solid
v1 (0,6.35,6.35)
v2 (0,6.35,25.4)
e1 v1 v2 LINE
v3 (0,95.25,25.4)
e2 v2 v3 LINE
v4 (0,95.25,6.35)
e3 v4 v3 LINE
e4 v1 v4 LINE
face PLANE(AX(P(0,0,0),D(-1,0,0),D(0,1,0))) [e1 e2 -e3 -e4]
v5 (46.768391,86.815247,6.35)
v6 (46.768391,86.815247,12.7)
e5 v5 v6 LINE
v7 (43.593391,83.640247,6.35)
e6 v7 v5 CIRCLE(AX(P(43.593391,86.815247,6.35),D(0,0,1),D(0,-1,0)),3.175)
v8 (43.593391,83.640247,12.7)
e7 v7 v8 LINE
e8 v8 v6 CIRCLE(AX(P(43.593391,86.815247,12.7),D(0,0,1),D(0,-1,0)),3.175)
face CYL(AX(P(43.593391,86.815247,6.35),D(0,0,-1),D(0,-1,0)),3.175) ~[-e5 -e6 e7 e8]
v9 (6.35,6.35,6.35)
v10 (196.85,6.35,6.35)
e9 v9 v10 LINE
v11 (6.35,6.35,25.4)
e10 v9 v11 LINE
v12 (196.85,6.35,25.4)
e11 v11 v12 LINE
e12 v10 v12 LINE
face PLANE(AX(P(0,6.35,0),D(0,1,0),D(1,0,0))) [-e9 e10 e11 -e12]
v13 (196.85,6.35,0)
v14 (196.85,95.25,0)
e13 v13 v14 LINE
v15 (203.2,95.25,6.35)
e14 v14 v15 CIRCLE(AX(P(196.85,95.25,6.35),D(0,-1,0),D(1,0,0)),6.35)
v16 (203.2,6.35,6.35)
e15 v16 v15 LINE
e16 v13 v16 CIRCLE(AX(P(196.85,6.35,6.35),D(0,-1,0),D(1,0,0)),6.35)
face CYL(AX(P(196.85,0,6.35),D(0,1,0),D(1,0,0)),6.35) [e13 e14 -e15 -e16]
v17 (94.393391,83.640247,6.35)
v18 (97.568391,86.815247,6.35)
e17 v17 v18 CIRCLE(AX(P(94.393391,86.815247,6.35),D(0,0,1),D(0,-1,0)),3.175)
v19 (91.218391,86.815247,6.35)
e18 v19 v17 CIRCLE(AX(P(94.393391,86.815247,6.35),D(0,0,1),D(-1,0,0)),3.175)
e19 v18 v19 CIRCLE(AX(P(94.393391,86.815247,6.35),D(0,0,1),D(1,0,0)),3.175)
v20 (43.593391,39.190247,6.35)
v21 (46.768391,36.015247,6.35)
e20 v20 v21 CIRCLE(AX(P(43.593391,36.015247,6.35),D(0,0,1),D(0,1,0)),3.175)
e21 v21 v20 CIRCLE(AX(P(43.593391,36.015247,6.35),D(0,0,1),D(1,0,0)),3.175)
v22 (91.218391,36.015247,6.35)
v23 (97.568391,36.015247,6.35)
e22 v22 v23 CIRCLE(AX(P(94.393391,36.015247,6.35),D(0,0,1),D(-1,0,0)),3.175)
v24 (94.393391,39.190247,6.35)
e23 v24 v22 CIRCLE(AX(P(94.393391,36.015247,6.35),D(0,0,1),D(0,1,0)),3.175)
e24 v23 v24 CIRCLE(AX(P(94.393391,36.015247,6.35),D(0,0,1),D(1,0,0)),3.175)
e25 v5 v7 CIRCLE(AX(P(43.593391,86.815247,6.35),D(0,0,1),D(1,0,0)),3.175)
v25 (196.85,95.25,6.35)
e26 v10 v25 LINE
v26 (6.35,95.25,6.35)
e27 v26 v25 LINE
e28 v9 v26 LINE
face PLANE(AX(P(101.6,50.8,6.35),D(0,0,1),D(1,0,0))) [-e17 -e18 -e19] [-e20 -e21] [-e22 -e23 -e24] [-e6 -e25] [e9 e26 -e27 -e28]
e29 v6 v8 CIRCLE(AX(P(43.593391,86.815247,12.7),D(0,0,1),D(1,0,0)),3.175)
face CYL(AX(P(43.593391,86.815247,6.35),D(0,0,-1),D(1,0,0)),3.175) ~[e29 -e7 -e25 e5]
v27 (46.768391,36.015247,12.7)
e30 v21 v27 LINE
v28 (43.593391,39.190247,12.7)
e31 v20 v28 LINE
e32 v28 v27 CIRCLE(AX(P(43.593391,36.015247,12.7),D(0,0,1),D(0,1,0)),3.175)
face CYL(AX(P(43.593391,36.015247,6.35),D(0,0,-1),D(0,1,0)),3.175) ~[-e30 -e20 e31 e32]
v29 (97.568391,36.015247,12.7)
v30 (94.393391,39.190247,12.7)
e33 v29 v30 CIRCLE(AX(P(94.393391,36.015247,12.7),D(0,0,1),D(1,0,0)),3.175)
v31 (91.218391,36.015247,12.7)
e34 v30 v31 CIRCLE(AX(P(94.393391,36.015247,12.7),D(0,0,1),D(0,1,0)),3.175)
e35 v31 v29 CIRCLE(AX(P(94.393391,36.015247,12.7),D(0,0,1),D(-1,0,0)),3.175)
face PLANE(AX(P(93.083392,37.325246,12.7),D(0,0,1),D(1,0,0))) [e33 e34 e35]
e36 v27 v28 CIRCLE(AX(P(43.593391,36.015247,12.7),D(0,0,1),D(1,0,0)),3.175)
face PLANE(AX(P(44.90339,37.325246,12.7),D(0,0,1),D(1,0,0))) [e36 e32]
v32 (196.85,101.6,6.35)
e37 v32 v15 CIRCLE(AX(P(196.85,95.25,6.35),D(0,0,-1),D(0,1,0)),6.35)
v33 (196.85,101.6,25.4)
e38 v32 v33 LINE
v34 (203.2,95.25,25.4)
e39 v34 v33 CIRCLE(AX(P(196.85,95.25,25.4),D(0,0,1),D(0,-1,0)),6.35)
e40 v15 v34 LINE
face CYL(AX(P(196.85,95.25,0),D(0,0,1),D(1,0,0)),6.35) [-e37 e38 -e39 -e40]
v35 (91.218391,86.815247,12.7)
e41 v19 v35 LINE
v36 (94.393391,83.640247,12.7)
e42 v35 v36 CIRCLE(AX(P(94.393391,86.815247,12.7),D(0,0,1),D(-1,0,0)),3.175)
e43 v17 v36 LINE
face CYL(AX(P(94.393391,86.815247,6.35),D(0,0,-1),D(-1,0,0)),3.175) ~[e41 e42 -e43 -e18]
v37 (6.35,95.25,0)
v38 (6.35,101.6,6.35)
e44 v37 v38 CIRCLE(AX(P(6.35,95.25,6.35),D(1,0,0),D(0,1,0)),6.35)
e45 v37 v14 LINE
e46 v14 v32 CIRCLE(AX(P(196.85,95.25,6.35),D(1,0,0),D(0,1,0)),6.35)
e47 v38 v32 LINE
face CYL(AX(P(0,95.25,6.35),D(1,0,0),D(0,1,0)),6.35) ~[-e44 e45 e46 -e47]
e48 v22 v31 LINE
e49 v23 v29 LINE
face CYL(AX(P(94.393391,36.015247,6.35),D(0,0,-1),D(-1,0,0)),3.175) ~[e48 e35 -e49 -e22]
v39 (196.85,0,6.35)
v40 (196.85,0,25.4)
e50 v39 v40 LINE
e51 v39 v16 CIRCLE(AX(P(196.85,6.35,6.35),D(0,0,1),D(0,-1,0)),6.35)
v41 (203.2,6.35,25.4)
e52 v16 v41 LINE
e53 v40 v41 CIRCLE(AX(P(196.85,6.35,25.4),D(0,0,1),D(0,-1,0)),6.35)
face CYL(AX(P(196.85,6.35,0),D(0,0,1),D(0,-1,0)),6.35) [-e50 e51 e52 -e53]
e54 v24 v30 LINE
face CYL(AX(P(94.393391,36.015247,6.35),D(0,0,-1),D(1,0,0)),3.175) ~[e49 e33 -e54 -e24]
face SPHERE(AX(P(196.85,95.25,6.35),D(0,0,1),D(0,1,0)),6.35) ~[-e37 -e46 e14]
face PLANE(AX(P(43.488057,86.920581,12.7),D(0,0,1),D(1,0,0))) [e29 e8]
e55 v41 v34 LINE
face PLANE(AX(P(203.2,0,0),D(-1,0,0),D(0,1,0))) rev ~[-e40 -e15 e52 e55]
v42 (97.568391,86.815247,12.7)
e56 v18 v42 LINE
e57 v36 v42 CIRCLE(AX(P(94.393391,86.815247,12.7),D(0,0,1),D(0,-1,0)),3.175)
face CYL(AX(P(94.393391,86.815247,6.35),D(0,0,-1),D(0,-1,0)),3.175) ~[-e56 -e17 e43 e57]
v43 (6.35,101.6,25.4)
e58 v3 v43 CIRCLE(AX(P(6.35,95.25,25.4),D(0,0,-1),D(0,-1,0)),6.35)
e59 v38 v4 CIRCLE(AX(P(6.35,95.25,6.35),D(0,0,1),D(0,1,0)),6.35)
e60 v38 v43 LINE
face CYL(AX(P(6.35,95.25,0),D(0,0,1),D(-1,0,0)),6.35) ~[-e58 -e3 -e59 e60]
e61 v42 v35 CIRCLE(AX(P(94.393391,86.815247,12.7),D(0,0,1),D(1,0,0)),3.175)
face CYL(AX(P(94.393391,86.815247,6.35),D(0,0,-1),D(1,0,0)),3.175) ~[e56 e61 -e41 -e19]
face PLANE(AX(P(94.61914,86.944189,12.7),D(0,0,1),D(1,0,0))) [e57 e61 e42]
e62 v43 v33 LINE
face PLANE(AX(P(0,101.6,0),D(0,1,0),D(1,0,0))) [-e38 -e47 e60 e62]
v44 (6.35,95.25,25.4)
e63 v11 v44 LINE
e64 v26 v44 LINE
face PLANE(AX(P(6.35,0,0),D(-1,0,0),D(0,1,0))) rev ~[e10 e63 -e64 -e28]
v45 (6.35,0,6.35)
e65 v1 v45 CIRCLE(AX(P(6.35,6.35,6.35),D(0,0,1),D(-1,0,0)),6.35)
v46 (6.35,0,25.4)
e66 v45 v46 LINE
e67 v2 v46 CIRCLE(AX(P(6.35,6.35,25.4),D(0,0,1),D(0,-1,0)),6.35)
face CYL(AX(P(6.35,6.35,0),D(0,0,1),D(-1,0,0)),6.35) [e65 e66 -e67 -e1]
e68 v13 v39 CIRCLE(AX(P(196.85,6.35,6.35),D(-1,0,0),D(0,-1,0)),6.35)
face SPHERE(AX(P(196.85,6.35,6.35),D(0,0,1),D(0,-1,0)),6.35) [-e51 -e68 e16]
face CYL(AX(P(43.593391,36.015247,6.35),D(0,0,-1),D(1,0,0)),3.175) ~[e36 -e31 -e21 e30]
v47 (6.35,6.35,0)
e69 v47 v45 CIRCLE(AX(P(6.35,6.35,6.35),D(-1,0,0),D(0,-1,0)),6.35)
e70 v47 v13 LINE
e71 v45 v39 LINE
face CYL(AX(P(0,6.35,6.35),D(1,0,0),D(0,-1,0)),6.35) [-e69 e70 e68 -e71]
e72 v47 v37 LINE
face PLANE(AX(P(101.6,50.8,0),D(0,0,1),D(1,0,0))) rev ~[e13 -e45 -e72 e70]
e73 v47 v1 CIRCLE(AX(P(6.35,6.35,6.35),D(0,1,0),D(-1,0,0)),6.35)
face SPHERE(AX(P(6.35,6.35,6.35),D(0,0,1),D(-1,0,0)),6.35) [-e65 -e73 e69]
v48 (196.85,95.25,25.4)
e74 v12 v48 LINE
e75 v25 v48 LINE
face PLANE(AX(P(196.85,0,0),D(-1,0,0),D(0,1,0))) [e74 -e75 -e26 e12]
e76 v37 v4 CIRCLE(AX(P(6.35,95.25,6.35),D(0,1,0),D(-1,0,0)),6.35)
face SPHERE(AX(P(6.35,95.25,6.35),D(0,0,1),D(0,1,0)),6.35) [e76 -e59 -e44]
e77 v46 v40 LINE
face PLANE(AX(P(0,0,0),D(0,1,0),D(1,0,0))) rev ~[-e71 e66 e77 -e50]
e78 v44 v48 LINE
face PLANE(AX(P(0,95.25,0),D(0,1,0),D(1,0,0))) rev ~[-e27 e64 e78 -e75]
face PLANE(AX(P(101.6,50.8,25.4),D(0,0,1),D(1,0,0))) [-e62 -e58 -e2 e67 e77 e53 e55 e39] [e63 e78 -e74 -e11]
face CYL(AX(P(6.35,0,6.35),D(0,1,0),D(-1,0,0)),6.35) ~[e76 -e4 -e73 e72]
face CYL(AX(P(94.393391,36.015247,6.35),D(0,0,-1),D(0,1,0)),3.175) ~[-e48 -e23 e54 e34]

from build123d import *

# Parameters (mm, degrees)
F0_W     = 203.2
F0_H     = 101.6
F1_DEPTH = 25.4
F2_R     = 6.35
F3_T     = 6.35
F5_DEPTH = 6.35


# Not quite as in the source:
# - a shell that OpenCascade refuses in one call is made with other operations: the cavity is built on its own and cut out


with BuildPart() as f1:
    # F0 (on Top) → F1 (new body)
    with BuildSketch(Plane.XY):
        with Locations((101.6, 50.8)):
            Rectangle(F0_W, F0_H)
    extrude(amount=F1_DEPTH)

    # F2
    f2_edges = [f1.edges().sort_by_distance(p)[0] for p in [
        (0, 0, 12.7),
        (203.2, 0, 12.7),
        (0, 101.6, 12.7),
        (203.2, 101.6, 12.7),
        (101.6, 101.6, 0),
        (0, 50.8, 0),
        (101.6, 0, 0),
        (203.2, 50.8, 0),
    ]]
    fillet(f2_edges, radius=F2_R)

    # F3: shell of thickness 6.35, made by hand


with BuildPart() as f3_core1:
    # F3_t2: copy of F1
    add(f1.part)

    # the walls: a layer under each face that stays
    f3_faces = [f3_core1.faces().sort_by_distance(p)[0] for p in [
        (0, 50.8, 15.875),
        (101.6, 101.6, 15.875),
        (101.6, 0, 15.875),
        (203.2, 50.8, 15.875),
        (101.6, 50.8, 0),
    ]]
    thicken(f3_faces, amount=-F3_T, mode=Mode.SUBTRACT)


with BuildPart() as f1_1:
    add(f1.part)

    # what is left inside the walls is the cavity
    f3_cavity = [f3_core1.part.solids().sort_by_distance(p)[0] for p in [
        (101.6, 35.983333, 25.3365),
    ]]
    add(f3_cavity, mode=Mode.SUBTRACT)

    # F4 (on face) → F5 (join)
    with BuildSketch(Plane.XY.offset(6.35)):
        with BuildLine():
            Line((43.5933910498, 86.815246595), (46.7683910498, 86.815246595))
            ThreePointArc((46.7683910498, 86.815246595), (41.3483270196, 89.0603106253), (43.5933910498, 83.640246595))
            Line((43.5933910498, 83.640246595), (43.5933910498, 86.815246595))
        make_face()
        with BuildLine():
            ThreePointArc((43.5933910498, 83.640246595), (45.8384550801, 84.5701825647), (46.7683910498, 86.815246595))
            Line((46.7683910498, 86.815246595), (43.5933910498, 86.815246595))
            Line((43.5933910498, 86.815246595), (43.5933910498, 83.640246595))
        make_face()
        with BuildLine():
            ThreePointArc((97.5683910498, 86.815246595), (94.3933910498, 89.990246595), (91.2183910498, 86.815246595))
            Line((91.2183910498, 86.815246595), (94.3933910498, 86.815246595))
            Line((94.3933910498, 86.815246595), (94.3933910498, 83.640246595))
            ThreePointArc((94.3933910498, 83.640246595), (96.6384550801, 84.5701825647), (97.5683910498, 86.815246595))
        make_face()
        with BuildLine():
            Line((94.3933910498, 86.815246595), (91.2183910498, 86.815246595))
            ThreePointArc((91.2183910498, 86.815246595), (92.1483270196, 84.5701825647), (94.3933910498, 83.640246595))
            Line((94.3933910498, 83.640246595), (94.3933910498, 86.815246595))
        make_face()
        with BuildLine():
            Line((94.3933910498, 36.015246595), (94.3933910498, 39.190246595))
            ThreePointArc((94.3933910498, 39.190246595), (92.1483270196, 38.2603106253), (91.2183910498, 36.015246595))
            Line((91.2183910498, 36.015246595), (94.3933910498, 36.015246595))
        make_face()
        with BuildLine():
            ThreePointArc((46.7683910498, 36.015246595), (45.8384550801, 38.2603106253), (43.5933910498, 39.190246595))
            Line((43.5933910498, 39.190246595), (43.5933910498, 36.015246595))
            Line((43.5933910498, 36.015246595), (46.7683910498, 36.015246595))
        make_face()
        with BuildLine():
            Line((43.5933910498, 36.015246595), (43.5933910498, 39.190246595))
            ThreePointArc((43.5933910498, 39.190246595), (41.3483270196, 33.7701825647), (46.7683910498, 36.015246595))
            Line((46.7683910498, 36.015246595), (43.5933910498, 36.015246595))
        make_face()
        with BuildLine():
            ThreePointArc((97.5683910498, 36.015246595), (96.6384550801, 38.2603106253), (94.3933910498, 39.190246595))
            Line((94.3933910498, 39.190246595), (94.3933910498, 36.015246595))
            Line((94.3933910498, 36.015246595), (91.2183910498, 36.015246595))
            ThreePointArc((91.2183910498, 36.015246595), (94.3933910498, 32.840246595), (97.5683910498, 36.015246595))
        make_face()
    extrude(amount=F5_DEPTH)


solid = f1_1.part
